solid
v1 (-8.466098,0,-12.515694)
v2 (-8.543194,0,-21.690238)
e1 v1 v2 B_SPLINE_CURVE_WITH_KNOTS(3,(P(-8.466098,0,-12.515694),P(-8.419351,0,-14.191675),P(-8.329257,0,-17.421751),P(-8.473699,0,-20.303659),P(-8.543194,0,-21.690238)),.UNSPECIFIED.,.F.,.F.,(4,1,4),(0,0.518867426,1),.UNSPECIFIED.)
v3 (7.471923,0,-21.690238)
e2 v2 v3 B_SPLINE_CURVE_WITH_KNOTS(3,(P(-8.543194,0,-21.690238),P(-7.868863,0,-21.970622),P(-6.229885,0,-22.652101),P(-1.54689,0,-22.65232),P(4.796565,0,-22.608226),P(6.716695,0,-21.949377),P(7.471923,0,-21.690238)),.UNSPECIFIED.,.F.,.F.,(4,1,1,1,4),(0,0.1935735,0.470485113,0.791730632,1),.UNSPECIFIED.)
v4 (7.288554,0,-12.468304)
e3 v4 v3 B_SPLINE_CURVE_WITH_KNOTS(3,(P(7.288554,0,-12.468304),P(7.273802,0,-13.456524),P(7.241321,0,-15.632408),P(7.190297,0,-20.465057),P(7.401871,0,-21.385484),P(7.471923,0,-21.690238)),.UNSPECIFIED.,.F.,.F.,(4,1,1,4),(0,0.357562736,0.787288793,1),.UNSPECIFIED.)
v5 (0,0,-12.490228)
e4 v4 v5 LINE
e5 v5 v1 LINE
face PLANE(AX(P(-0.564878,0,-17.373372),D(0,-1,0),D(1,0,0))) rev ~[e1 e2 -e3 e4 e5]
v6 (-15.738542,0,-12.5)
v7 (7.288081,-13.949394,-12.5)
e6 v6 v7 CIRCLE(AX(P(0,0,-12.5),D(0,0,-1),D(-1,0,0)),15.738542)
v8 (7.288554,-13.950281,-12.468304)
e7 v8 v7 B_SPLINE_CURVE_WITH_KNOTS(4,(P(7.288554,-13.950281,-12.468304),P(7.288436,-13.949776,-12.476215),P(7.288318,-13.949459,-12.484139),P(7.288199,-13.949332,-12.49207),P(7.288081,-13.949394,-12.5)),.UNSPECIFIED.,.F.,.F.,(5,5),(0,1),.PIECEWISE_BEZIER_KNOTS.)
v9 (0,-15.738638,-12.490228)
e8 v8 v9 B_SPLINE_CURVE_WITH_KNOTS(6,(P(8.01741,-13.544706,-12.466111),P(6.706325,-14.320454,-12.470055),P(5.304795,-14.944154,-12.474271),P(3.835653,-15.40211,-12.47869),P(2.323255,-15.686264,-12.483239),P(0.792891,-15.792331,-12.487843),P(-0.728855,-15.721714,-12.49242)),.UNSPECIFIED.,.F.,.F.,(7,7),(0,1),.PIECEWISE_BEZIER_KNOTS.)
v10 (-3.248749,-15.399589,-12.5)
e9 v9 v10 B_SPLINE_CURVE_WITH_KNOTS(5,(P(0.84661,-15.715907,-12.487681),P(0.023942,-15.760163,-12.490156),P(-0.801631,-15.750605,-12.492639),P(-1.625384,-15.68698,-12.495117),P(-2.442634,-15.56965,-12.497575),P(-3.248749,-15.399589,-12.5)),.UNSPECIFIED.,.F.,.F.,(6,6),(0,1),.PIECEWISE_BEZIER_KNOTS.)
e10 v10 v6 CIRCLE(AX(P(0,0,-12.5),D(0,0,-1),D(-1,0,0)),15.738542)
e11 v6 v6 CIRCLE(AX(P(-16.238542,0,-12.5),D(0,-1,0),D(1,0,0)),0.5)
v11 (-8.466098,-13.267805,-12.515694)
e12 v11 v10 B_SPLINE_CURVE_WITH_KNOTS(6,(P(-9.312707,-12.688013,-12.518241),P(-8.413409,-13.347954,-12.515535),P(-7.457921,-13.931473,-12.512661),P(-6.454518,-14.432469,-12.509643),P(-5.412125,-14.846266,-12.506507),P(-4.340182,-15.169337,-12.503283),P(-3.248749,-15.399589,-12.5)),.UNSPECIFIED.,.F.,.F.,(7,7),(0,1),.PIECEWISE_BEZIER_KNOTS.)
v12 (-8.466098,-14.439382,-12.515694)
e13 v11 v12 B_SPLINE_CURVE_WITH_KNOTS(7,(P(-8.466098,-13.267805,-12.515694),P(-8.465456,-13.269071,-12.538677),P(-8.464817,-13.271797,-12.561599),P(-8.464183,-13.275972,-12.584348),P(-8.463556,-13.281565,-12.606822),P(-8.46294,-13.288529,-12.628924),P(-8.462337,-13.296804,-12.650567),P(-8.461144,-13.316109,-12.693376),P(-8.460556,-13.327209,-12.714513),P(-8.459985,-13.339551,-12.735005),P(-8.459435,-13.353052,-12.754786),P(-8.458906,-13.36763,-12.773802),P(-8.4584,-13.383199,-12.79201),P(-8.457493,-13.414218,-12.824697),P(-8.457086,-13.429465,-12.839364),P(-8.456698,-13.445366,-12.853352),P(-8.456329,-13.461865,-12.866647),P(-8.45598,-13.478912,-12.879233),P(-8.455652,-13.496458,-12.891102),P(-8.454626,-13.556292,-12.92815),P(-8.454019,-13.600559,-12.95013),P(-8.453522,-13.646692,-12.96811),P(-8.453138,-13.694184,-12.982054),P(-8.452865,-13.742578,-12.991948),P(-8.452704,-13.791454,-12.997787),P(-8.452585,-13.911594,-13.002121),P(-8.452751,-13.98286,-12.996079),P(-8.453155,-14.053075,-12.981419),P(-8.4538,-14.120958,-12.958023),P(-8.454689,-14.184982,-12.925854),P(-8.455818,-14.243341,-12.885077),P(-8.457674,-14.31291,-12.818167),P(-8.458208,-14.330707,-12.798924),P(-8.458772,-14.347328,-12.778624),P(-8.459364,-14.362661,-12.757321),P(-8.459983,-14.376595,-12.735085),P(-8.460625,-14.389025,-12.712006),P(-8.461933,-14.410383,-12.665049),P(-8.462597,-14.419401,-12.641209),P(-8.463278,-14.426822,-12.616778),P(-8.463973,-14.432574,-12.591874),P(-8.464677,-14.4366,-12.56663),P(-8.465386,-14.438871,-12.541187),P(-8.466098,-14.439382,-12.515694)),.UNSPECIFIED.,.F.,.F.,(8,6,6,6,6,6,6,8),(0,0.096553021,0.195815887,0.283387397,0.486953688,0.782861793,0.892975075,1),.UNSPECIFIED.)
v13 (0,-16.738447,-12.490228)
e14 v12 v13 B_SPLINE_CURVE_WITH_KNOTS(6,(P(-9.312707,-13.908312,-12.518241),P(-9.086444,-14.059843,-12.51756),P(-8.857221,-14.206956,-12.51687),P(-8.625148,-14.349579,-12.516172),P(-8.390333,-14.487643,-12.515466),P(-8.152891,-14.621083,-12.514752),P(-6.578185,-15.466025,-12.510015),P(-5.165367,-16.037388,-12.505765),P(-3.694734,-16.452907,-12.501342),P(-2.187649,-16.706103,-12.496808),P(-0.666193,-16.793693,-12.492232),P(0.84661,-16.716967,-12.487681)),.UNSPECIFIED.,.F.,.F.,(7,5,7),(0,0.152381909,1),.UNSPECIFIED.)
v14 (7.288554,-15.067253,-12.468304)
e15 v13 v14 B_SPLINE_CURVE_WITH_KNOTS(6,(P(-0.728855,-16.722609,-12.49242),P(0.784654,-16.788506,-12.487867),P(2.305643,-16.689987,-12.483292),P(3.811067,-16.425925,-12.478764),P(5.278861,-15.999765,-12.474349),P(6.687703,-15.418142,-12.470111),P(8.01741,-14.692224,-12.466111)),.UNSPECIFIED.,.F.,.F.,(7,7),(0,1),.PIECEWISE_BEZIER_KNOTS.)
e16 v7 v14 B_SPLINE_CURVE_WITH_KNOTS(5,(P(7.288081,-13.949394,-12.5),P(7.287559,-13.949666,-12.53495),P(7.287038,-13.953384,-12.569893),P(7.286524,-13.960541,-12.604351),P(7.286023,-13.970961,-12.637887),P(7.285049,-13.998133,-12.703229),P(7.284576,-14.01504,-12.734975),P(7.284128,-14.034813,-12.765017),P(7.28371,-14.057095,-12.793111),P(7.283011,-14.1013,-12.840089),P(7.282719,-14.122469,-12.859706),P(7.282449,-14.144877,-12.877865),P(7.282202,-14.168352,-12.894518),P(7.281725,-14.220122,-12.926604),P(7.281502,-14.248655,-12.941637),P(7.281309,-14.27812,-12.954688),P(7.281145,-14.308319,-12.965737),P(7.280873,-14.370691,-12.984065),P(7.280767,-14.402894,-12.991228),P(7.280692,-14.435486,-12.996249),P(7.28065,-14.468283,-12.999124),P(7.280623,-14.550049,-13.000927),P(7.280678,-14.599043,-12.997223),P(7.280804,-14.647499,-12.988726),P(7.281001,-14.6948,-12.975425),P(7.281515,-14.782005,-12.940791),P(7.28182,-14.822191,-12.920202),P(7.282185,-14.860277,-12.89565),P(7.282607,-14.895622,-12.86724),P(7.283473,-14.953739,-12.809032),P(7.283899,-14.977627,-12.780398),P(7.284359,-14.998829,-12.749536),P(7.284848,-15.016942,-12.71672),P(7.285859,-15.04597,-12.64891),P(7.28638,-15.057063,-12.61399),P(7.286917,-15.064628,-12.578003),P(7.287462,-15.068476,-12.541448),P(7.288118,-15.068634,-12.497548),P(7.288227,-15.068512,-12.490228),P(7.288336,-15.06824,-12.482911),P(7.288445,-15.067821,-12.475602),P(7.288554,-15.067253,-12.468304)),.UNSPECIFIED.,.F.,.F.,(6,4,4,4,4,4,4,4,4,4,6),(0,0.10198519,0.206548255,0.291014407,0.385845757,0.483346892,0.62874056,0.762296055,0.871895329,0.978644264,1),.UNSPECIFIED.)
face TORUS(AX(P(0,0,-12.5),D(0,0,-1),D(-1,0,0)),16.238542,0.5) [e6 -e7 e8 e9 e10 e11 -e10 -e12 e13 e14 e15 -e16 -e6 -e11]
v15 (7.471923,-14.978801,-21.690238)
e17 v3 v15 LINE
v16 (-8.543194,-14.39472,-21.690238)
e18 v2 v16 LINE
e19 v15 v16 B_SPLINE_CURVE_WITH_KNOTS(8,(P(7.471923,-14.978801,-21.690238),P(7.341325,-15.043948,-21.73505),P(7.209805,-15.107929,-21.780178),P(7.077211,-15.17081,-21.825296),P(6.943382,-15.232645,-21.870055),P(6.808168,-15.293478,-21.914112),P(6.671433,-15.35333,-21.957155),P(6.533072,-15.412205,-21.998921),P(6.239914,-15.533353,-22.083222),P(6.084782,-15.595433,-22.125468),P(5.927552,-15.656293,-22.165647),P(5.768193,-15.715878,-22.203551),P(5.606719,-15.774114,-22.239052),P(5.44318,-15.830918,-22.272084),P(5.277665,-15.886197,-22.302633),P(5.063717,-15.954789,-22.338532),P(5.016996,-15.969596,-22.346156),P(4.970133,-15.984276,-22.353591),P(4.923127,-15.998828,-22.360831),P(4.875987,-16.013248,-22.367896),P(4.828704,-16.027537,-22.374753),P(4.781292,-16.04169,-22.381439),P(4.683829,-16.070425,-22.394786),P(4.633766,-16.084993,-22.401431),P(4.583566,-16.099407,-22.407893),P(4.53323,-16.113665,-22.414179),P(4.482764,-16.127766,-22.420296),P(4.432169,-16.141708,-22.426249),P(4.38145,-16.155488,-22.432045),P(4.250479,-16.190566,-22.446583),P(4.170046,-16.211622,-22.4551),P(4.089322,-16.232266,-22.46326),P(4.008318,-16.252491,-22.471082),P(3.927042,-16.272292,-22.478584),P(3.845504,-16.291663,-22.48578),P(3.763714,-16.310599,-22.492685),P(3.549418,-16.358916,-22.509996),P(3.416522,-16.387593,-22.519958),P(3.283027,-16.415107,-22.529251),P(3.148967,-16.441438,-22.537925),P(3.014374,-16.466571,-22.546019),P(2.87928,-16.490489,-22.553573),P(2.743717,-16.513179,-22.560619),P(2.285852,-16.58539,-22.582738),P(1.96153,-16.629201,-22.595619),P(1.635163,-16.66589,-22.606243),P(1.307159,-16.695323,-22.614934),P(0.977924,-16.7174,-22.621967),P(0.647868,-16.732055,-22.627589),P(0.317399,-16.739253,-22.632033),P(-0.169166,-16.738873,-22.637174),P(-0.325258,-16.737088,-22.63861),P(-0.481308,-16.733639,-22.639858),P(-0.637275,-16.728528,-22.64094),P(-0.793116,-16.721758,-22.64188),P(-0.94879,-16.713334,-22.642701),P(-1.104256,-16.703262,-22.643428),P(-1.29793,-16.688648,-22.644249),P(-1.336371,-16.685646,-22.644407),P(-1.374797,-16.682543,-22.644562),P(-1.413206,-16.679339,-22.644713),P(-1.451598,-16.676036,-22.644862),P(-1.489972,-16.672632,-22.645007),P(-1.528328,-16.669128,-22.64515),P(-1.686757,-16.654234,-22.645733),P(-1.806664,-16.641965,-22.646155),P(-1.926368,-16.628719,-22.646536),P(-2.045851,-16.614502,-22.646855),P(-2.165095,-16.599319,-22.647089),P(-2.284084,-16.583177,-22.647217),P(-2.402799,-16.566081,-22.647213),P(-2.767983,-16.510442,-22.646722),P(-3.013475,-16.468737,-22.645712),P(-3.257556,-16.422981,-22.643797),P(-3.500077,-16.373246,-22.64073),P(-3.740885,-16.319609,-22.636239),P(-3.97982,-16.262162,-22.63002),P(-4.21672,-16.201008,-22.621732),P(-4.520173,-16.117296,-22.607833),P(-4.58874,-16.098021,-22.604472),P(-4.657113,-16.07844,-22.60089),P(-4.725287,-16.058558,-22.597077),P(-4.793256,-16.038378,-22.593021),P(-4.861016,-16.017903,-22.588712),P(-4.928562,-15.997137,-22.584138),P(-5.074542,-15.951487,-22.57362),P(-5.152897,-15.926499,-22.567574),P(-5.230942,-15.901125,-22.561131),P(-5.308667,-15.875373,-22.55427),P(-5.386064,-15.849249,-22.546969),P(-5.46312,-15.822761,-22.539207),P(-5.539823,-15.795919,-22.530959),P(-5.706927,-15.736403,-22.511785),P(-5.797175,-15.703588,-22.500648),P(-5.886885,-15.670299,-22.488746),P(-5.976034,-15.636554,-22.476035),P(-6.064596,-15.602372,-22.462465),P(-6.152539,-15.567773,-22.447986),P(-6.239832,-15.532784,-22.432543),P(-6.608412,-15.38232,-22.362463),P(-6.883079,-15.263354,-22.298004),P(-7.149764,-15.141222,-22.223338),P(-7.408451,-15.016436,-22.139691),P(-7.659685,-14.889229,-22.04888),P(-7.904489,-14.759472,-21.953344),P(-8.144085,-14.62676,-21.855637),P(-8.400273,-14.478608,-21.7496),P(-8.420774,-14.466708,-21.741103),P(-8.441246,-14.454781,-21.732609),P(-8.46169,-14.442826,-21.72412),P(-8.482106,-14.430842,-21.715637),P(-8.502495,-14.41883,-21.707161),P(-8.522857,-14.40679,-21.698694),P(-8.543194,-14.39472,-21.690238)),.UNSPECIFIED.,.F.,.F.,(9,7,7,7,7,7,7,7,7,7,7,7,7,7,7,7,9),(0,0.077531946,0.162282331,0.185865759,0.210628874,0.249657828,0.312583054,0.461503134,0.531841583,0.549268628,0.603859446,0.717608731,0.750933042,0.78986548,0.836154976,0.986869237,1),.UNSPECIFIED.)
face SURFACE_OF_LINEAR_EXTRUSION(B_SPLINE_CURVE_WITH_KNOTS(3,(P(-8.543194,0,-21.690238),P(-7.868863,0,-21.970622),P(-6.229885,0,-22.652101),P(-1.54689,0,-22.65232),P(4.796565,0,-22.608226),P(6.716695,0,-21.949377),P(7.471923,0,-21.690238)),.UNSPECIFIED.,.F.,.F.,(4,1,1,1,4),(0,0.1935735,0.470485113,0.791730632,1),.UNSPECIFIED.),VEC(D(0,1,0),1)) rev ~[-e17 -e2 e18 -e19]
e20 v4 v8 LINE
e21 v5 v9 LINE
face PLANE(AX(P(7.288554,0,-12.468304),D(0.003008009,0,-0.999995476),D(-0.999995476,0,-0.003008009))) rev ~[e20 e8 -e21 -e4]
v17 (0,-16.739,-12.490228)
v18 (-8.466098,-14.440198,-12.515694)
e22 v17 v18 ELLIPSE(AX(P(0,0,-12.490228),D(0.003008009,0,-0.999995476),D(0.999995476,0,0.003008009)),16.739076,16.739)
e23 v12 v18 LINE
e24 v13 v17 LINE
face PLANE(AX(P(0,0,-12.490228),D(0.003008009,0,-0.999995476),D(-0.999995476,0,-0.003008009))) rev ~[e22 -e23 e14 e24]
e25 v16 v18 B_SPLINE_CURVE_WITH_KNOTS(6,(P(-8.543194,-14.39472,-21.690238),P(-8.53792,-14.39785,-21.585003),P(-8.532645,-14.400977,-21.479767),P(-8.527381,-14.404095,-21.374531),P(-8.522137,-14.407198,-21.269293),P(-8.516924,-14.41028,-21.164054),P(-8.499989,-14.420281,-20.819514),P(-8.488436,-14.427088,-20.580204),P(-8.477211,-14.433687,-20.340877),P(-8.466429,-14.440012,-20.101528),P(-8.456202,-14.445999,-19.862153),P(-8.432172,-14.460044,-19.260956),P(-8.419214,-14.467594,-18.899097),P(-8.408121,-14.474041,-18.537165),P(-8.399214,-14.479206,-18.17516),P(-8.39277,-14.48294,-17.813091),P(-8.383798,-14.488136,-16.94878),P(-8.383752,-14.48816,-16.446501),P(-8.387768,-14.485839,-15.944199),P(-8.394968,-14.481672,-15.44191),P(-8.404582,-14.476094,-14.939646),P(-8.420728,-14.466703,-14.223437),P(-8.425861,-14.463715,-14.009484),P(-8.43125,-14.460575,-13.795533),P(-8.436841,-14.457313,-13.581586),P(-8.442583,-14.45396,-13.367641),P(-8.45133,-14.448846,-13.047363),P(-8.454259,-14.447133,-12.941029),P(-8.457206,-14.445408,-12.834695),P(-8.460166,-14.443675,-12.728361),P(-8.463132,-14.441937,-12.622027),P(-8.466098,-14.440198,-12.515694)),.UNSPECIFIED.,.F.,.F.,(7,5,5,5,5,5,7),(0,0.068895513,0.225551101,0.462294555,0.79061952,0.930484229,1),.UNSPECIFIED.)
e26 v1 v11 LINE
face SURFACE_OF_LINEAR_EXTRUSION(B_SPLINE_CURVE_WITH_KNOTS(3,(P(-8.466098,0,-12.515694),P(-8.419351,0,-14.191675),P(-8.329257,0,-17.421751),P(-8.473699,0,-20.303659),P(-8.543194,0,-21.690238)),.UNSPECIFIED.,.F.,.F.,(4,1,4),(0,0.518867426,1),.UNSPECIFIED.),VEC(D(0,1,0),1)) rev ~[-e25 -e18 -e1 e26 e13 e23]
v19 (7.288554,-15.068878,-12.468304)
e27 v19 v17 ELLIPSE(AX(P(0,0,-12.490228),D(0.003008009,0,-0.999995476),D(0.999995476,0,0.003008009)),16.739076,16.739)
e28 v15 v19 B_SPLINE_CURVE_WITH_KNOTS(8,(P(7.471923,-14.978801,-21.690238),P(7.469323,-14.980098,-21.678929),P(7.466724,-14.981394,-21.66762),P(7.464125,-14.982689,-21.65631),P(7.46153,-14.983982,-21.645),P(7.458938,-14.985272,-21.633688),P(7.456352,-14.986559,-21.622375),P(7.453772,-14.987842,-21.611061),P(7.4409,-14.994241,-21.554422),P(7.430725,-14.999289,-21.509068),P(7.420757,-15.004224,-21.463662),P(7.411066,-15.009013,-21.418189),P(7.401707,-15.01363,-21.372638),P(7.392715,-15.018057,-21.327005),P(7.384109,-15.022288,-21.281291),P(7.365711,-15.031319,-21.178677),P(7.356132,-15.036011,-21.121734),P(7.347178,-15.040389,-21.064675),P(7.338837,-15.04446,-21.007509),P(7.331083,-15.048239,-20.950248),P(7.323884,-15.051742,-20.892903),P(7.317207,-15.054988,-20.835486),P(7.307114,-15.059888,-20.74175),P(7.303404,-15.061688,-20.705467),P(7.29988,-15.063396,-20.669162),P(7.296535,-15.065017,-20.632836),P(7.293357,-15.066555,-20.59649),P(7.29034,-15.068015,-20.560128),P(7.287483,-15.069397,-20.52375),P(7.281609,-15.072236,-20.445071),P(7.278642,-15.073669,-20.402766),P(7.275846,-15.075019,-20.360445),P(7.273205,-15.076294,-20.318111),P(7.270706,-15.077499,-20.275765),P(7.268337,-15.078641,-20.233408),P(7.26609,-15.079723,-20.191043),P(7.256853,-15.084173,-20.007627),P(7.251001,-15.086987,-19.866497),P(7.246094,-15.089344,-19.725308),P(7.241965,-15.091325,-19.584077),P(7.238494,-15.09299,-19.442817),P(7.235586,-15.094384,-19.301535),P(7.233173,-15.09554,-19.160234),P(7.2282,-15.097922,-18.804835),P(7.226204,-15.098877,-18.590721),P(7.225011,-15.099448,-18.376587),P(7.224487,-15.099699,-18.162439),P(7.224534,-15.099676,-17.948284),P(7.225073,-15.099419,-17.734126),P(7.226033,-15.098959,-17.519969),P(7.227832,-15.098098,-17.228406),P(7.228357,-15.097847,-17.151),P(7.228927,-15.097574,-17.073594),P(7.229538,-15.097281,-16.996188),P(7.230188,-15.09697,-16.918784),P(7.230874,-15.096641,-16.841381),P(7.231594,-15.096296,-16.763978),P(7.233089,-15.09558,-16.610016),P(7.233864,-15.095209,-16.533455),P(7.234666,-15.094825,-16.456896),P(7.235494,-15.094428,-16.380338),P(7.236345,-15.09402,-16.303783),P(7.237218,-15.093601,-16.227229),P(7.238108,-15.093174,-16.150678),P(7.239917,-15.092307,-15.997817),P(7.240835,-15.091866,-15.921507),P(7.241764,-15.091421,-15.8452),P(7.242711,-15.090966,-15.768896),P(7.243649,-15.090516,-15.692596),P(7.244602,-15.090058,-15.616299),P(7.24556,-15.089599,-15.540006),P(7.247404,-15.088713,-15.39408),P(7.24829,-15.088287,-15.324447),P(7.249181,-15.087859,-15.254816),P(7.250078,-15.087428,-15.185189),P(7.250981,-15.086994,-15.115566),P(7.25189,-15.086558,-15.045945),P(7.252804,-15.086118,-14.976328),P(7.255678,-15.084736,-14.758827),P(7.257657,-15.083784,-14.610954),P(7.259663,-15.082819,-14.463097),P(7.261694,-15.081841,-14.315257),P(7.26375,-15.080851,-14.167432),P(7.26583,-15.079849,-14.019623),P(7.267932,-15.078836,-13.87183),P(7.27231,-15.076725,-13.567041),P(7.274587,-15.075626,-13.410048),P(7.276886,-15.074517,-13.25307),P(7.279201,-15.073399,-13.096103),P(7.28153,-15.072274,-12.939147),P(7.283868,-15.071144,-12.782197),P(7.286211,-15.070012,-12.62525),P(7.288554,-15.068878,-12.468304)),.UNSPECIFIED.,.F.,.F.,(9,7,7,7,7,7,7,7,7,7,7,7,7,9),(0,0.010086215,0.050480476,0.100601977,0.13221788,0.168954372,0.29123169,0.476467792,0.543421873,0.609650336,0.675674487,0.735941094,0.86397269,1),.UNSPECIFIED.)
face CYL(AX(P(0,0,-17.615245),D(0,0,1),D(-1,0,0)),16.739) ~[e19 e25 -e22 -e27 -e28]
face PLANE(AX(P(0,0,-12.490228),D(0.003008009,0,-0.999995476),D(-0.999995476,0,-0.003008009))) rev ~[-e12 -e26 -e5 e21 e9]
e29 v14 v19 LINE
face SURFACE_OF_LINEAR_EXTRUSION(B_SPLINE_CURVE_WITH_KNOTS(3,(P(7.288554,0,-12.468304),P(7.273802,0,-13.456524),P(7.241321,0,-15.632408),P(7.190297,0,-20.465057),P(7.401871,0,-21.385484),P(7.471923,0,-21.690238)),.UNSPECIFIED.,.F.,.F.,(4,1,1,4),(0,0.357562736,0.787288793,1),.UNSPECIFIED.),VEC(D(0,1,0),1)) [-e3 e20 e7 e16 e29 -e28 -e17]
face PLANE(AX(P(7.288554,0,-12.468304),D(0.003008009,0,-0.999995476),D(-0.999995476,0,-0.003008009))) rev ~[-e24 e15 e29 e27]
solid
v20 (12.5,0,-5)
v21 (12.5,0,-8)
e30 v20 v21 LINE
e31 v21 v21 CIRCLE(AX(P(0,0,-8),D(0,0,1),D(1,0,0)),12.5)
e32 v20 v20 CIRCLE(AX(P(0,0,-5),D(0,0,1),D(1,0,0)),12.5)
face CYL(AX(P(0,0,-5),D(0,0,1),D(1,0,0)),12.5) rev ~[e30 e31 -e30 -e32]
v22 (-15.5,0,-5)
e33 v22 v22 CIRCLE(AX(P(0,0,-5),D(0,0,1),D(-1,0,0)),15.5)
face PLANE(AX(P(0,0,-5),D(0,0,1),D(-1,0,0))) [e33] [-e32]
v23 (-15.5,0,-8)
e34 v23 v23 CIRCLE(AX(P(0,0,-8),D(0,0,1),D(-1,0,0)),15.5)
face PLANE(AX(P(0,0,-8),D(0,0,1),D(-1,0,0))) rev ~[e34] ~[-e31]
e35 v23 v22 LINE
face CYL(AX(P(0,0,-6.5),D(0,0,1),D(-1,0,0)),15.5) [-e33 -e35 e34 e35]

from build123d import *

# Parameters (mm, degrees)
F1_R      = 0.5
F4_DEPTH  = 20
F5_W      = 10
F5_H      = 10.4441631917
F7_W      = 15.5
F7_H      = 3
F9_R      = 12.5
F10_DEPTH = 17.6481520487


with BuildPart() as f2:
    # F1 (on face) → F2 (revolve)
    with BuildSketch(Plane.XZ):
        with Locations((-16.2385423089, -12.5)):
            Circle(F1_R)
    revolve(axis=Axis((0, 0, -13.5), (0, 0, -1)))

    # F3 (on Front) → F4 (join)
    with BuildSketch(Plane.XZ):
        with BuildLine():
            Line((0, -12.4902276899), (-8.4660975263, -12.515693903))
            add(Edge.make_bspline(
                [(-8.4660975263, -12.515693903), (-8.4193508372, -14.191675073), (-8.329257132, -17.4217509736), (-8.4736987191, -20.3036586232), (-8.5431942716, -21.6902382672)],
                knots=[0, 0, 0, 0, 0.5188674265, 1, 1, 1, 1], degree=3))
            add(Edge.make_bspline(
                [(-8.5431942716, -21.6902382672), (-7.8688632415, -21.9706217142), (-6.2298852231, -22.652100522), (-1.5468896764, -22.6523203072), (4.7965653474, -22.6082263247), (6.7166952245, -21.949377428), (7.471922785, -21.6902382672)],
                knots=[0, 0, 0, 0, 0.1935734996, 0.4704851129, 0.7917306318, 1, 1, 1, 1], degree=3))
            add(Edge.make_bspline(
                [(7.2885542177, -12.4683035538), (7.2738022544, -13.4565242356), (7.2413210861, -15.632408325), (7.1902968982, -20.465056858), (7.4018706428, -21.3854843849), (7.471922785, -21.6902382672)],
                knots=[0, 0, 0, 0, 0.3575627357, 0.7872887927, 1, 1, 1, 1], degree=3))
            Line((7.2885542177, -12.4683035538), (0, -12.4902276899))
        make_face()
    extrude(amount=F4_DEPTH)

    # F5 (on Front) → F6 (revolve, cut)
    with BuildSketch(Plane.XZ):
        with Locations((-21.739, -17.6152454027)):
            Rectangle(F5_W, F5_H)
    revolve(axis=Axis((0, 0, -16.7107414454), (0, 0, -1)), mode=Mode.SUBTRACT)


with BuildPart() as f8:
    # F7 (on Front) → F8 (revolve)
    with BuildSketch(Plane.XZ):
        with Locations((-7.75, -6.5)):
            Rectangle(F7_W, F7_H)
    revolve(axis=Axis((0, 0, -6.5), (0, 0, 1)))

    # F9 (on face) → F10 (cut, through all)
    with BuildSketch(Plane.XY.offset(-5)):
        Circle(F9_R)
    extrude(amount=-F10_DEPTH, mode=Mode.SUBTRACT)


solid = Compound([f2.part, f8.part])
